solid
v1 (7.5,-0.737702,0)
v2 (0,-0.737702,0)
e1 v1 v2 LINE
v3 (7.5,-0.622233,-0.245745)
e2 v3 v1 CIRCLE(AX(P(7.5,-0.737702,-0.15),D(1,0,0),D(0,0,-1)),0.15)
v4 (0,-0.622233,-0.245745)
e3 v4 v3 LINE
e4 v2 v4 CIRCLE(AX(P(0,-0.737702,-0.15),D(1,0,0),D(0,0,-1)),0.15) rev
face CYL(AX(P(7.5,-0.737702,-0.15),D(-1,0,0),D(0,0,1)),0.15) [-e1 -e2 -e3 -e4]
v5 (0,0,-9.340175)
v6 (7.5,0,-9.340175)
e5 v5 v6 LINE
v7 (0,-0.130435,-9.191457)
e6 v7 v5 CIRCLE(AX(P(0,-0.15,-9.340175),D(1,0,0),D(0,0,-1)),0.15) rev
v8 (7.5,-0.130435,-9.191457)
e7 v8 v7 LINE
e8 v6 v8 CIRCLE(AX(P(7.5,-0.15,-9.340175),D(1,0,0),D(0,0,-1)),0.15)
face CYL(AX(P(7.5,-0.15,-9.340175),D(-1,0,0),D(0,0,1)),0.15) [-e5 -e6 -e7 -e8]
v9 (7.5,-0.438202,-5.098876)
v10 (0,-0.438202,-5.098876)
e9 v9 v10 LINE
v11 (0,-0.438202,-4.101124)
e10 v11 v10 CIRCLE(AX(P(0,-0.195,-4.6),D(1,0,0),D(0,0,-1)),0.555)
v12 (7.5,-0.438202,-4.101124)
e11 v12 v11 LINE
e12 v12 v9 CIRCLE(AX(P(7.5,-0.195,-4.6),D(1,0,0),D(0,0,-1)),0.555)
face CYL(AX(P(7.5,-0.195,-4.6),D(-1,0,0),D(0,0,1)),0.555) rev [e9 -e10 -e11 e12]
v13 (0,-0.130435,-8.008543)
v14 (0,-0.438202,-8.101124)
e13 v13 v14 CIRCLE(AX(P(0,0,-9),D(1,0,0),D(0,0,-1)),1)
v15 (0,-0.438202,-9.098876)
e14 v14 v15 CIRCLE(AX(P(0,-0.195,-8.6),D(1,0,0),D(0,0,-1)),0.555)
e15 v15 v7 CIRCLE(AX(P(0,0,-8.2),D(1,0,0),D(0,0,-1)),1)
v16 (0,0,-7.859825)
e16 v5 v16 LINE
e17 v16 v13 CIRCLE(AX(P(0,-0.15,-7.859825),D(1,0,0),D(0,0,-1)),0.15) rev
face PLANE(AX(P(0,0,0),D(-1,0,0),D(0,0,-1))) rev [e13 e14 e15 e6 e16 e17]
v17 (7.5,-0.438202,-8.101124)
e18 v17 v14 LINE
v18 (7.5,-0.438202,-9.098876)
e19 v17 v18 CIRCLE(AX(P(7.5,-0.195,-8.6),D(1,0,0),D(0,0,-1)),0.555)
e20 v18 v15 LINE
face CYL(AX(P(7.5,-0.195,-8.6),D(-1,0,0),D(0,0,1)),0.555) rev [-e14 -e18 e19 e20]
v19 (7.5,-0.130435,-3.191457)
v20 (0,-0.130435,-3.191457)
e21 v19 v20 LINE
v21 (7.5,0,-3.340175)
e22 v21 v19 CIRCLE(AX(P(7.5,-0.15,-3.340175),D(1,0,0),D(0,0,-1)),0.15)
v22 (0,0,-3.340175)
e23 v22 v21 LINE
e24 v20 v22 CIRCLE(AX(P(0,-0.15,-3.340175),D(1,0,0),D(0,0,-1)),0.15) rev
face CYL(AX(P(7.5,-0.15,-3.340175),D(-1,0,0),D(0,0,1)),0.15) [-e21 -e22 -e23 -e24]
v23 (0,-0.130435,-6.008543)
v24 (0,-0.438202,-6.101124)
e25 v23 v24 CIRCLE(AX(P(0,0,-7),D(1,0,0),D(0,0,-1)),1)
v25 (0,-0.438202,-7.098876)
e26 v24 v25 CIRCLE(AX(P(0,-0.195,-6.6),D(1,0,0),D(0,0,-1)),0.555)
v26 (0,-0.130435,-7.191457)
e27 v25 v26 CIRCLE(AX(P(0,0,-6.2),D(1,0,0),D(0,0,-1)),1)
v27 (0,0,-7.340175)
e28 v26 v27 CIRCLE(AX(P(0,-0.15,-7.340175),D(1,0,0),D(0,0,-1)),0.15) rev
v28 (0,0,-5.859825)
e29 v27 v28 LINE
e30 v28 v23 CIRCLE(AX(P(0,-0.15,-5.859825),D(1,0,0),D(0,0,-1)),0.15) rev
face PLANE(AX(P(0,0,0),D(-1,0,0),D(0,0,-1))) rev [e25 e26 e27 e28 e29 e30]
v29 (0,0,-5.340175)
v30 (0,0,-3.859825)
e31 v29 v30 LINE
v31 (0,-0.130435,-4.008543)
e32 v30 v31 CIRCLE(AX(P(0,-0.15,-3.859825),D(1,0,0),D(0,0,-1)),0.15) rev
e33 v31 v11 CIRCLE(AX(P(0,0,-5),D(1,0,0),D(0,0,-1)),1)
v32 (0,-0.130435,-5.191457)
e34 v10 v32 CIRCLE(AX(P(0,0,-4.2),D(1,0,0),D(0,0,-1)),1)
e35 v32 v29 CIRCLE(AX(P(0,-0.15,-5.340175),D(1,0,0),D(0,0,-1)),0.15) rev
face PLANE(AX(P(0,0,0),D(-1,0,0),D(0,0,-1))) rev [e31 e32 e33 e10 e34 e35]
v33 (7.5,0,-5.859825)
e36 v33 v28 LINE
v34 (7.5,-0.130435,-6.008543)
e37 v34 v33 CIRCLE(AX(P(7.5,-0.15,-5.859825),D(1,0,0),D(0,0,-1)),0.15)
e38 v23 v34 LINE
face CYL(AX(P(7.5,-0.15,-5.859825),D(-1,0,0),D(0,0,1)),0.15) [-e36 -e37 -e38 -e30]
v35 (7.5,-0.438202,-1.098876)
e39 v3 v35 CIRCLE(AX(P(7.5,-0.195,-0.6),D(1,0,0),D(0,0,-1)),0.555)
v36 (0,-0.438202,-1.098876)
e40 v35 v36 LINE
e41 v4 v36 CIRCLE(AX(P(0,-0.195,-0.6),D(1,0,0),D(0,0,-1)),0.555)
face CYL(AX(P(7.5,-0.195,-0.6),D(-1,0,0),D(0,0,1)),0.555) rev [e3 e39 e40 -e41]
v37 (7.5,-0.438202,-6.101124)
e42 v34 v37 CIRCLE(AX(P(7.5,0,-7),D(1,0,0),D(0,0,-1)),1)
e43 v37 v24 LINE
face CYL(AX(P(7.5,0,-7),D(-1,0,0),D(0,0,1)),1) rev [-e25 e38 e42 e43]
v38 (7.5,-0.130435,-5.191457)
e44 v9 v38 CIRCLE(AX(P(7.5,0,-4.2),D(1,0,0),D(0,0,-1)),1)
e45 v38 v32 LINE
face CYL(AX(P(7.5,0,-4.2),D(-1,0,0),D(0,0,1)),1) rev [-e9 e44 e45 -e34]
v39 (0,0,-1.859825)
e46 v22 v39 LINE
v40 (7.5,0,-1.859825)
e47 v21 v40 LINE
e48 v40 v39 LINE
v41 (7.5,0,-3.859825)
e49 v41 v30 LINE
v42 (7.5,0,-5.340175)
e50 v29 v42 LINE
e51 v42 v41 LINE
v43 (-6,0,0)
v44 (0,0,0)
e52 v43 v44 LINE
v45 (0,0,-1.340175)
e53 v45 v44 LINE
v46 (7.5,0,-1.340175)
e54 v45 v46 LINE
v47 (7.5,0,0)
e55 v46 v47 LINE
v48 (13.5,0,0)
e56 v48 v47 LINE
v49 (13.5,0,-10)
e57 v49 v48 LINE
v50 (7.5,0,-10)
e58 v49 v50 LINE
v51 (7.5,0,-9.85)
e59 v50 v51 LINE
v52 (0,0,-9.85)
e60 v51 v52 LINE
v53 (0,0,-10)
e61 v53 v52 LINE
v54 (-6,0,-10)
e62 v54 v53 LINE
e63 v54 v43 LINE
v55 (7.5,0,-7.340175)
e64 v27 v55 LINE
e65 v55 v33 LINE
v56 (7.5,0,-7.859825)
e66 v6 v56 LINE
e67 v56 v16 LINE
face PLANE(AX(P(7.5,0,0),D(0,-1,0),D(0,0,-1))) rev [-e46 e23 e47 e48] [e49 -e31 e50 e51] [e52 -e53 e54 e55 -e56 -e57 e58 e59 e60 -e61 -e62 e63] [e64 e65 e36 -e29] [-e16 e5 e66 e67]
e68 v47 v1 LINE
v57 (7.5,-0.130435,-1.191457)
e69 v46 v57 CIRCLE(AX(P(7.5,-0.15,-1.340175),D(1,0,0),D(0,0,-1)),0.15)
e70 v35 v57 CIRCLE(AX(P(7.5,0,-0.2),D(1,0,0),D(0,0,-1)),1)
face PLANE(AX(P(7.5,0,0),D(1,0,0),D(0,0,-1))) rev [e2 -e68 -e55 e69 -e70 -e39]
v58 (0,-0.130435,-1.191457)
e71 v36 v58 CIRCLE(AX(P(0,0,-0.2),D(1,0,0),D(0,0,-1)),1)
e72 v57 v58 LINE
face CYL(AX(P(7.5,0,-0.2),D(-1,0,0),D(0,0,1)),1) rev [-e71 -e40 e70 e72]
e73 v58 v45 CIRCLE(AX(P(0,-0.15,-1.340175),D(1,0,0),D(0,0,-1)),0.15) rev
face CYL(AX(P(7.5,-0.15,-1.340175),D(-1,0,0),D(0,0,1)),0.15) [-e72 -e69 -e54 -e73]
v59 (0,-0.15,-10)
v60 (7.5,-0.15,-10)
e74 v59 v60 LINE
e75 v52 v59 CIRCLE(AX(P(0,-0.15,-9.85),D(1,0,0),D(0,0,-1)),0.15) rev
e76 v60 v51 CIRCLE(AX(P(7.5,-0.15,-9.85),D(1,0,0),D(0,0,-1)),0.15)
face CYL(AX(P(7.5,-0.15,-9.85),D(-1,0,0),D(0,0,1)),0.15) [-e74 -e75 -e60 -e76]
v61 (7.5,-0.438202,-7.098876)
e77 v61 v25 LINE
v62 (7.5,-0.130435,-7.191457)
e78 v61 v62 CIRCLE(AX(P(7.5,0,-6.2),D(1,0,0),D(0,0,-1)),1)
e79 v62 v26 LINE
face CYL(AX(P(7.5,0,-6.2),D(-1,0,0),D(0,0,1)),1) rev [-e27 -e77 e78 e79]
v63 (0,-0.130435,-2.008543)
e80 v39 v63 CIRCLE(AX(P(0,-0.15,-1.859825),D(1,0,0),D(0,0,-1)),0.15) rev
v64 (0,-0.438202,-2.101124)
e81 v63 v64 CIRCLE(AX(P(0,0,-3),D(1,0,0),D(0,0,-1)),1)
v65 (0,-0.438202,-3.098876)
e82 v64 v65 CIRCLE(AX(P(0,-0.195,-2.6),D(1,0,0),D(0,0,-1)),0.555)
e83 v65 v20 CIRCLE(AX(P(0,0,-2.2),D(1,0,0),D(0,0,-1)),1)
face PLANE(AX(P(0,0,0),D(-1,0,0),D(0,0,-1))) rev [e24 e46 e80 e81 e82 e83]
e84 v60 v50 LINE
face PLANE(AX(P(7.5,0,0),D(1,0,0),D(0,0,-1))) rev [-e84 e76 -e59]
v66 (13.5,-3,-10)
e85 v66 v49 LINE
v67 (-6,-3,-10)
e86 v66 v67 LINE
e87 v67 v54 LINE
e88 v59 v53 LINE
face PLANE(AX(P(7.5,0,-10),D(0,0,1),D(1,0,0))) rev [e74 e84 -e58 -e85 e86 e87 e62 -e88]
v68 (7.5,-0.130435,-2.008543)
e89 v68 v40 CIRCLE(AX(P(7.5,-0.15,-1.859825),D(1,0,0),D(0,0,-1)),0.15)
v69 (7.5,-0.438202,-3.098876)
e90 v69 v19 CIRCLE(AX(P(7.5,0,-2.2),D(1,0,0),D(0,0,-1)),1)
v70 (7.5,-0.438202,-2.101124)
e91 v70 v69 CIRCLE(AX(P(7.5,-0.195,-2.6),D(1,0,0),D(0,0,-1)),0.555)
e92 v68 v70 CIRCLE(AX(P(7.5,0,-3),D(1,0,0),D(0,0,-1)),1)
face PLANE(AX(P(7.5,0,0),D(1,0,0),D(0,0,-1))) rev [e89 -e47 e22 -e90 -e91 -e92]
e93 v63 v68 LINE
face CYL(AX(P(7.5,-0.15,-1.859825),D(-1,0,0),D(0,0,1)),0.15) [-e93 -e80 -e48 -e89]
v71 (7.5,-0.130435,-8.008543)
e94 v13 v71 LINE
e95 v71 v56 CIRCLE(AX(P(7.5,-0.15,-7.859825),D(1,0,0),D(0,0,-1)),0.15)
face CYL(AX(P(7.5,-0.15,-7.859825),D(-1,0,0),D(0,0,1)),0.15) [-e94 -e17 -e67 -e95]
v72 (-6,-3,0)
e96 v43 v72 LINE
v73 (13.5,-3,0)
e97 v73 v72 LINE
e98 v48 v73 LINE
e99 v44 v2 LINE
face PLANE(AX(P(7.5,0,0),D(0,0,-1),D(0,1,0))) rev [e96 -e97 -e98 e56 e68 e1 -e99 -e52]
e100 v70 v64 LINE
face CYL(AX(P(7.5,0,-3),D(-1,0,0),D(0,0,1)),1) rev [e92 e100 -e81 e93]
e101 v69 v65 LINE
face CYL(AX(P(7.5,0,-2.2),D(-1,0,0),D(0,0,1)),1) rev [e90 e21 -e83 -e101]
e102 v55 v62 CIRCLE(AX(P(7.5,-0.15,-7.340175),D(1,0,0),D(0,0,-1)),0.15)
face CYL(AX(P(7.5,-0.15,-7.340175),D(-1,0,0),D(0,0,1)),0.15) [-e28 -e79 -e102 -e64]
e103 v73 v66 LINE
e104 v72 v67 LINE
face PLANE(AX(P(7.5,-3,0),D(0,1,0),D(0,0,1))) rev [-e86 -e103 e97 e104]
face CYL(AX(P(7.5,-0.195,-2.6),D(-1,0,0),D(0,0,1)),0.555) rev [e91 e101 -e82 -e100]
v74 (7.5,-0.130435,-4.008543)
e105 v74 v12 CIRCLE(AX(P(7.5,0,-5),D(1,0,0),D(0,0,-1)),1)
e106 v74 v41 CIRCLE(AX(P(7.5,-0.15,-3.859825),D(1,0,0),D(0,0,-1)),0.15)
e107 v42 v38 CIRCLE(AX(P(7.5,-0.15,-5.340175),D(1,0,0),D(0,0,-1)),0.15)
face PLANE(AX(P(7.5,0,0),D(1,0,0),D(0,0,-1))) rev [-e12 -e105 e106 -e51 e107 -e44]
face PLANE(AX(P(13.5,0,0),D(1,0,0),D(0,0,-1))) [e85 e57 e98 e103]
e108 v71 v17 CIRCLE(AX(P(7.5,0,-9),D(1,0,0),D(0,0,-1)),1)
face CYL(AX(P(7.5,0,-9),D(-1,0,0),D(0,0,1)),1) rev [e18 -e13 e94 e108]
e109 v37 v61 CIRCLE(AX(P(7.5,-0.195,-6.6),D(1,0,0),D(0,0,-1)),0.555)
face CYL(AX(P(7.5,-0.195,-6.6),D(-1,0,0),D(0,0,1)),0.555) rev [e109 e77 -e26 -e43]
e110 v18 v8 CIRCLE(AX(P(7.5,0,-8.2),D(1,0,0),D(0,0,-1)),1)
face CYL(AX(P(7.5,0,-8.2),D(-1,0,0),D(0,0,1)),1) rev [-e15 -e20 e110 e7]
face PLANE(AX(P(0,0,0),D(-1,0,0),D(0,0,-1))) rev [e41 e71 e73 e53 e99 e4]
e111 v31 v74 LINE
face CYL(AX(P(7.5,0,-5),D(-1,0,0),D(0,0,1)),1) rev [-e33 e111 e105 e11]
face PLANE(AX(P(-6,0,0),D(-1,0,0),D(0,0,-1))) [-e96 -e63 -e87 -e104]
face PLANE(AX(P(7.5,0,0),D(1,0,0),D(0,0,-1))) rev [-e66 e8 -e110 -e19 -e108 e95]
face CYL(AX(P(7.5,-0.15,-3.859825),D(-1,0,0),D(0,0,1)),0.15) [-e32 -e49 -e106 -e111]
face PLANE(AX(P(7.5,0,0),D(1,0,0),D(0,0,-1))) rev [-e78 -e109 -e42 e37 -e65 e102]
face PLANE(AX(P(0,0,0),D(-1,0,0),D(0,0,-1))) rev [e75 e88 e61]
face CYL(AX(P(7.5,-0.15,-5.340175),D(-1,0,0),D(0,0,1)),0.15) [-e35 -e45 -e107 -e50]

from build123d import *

# Parameters (mm, degrees)
SKETCH2_W           = 10
SKETCH2_H           = 3
BOSS_EXTRUDE1_DEPTH = 7.5
CUT_EXTRUDE2_DEPTH  = 13.854960132
LPATTERN2_COUNT     = 10
LPATTERN2_PITCH     = 2
FILLET2_START       = -1
FILLET2_DEPTH       = 9
SKETCH3_W           = 10
SKETCH3_H           = 3
BOSS_EXTRUDE2_DEPTH = 6


with BuildPart() as part:
    # Sketch2 → Boss-Extrude1 (new body)
    with BuildSketch(Plane(origin=(0, 0, 0), x_dir=(0, 0, -1), z_dir=(1, 0, 0))):
        with Locations((5, -1.5)):
            Rectangle(SKETCH2_W, SKETCH2_H)
    extrude(amount=BOSS_EXTRUDE1_DEPTH)

    # Sketch1 → Cut-Extrude2 (cut, through all)
    with BuildSketch(Plane(origin=(0, 0, 0), x_dir=(0, 0, -1), z_dir=(1, 0, 0))):
        with BuildLine():
            ThreePointArc((0.10112359, -0.438202237), (0.045620517, -0.221237163), (0.080384758, 0))
            Line((0.080384758, 0), (0, 0))
            ThreePointArc((0, 0), (0.025608803, -0.224859501), (0.10112359, -0.438202237))
        make_face()
        with BuildLine():
            ThreePointArc((1.155, -0.195), (1.146082164, -0.095907769), (1.119615242, 0))
            Line((1.119615242, 0), (0.080384758, 0))
            ThreePointArc((0.080384758, 0), (0.045620517, -0.221237163), (0.10112359, -0.438202237))
            ThreePointArc((0.10112359, -0.438202237), (0.6, -0.75), (1.09887641, -0.438202237))
            ThreePointArc((1.09887641, -0.438202237), (1.140787115, -0.319797021), (1.155, -0.195))
        make_face()
        with BuildLine():
            Line((0.080384758, 0), (1.119615242, 0))
            ThreePointArc((1.119615242, 0), (0.6, 0.36), (0.080384758, 0))
        make_face()
        with BuildLine():
            ThreePointArc((1.09887641, -0.438202237), (1.174391197, -0.224859501), (1.2, 0))
            Line((1.2, 0), (1.119615242, 0))
            ThreePointArc((1.119615242, 0), (1.146082164, -0.095907769), (1.155, -0.195))
            ThreePointArc((1.155, -0.195), (1.140787115, -0.319797021), (1.09887641, -0.438202237))
        make_face()
    cut_extrude2 = extrude(amount=CUT_EXTRUDE2_DEPTH, mode=Mode.SUBTRACT)

    # LPattern2: Cut-Extrude2 ×10
    with Locations(*[(0, 0, -i * LPATTERN2_PITCH) for i in range(1, LPATTERN2_COUNT)]):
        add(cut_extrude2, mode=Mode.SUBTRACT)

    # Fillet2: read off the stored shape, not the designer's step
    # Fillet2 outline → Fillet2 (cut)
    with BuildSketch(Plane.YZ.offset(FILLET2_START)):
        with BuildLine():
            Line((0, -10), (0, -9.85))
            ThreePointArc((0, -9.85), (-0.043933983, -9.956066017), (-0.15, -10))
            Line((-0.15, -10), (0, -10))
        make_face()
        with BuildLine():
            ThreePointArc((-0.130434783, -9.191456891), (-0.037228588, -9.241268354), (0, -9.340175425))
            Line((0, -9.340175425), (0, -9.2))
            ThreePointArc((0, -9.2), (-0.065357129, -9.197861937), (-0.130434783, -9.191456891))
        make_face()
        with BuildLine():
            Line((0, -8), (0, -7.859824575))
            ThreePointArc((0, -7.859824575), (-0.037228588, -7.958731646), (-0.130434783, -8.008543109))
            ThreePointArc((-0.130434783, -8.008543109), (-0.065357129, -8.002138063), (0, -8))
        make_face()
        with BuildLine():
            ThreePointArc((-0.130434783, -7.191456891), (-0.037228588, -7.241268354), (0, -7.340175425))
            Line((0, -7.340175425), (0, -7.2))
            ThreePointArc((0, -7.2), (-0.065357129, -7.197861937), (-0.130434783, -7.191456891))
        make_face()
        with BuildLine():
            Line((0, -6), (0, -5.859824575))
            ThreePointArc((0, -5.859824575), (-0.037228588, -5.958731646), (-0.130434783, -6.008543109))
            ThreePointArc((-0.130434783, -6.008543109), (-0.065357129, -6.002138063), (0, -6))
        make_face()
        with BuildLine():
            ThreePointArc((-0.130434783, -5.191456891), (-0.037228588, -5.241268354), (0, -5.340175425))
            Line((0, -5.340175425), (0, -5.2))
            ThreePointArc((0, -5.2), (-0.065357129, -5.197861937), (-0.130434783, -5.191456891))
        make_face()
        with BuildLine():
            Line((0, -4), (0, -3.859824575))
            ThreePointArc((0, -3.859824575), (-0.037228588, -3.958731646), (-0.130434783, -4.008543109))
            ThreePointArc((-0.130434783, -4.008543109), (-0.065357129, -4.002138063), (0, -4))
        make_face()
        with BuildLine():
            ThreePointArc((-0.130434783, -3.191456891), (-0.037228588, -3.241268354), (0, -3.340175425))
            Line((0, -3.340175425), (0, -3.2))
            ThreePointArc((0, -3.2), (-0.065357129, -3.197861937), (-0.130434783, -3.191456891))
        make_face()
        with BuildLine():
            Line((0, -2), (0, -1.859824575))
            ThreePointArc((0, -1.859824575), (-0.037228588, -1.958731646), (-0.130434783, -2.008543109))
            ThreePointArc((-0.130434783, -2.008543109), (-0.065357129, -2.002138063), (0, -2))
        make_face()
        with BuildLine():
            ThreePointArc((-0.737701575, 0), (-0.601941305, -0.086210119), (-0.622233155, -0.245744681))
            ThreePointArc((-0.622233155, -0.245744681), (-0.537928158, -0.163622551), (-0.438202247, -0.101123596))
            ThreePointArc((-0.438202247, -0.101123596), (-0.224859507, -0.025608804), (0, 0))
            Line((0, 0), (-0.737701575, 0))
        make_face()
        with BuildLine():
            ThreePointArc((-0.130434783, -1.191456891), (-0.037228588, -1.241268354), (0, -1.340175425))
            Line((0, -1.340175425), (0, -1.2))
            ThreePointArc((0, -1.2), (-0.065357129, -1.197861937), (-0.130434783, -1.191456891))
        make_face()
    extrude(amount=FILLET2_DEPTH, mode=Mode.SUBTRACT)

    # Sketch3 → Boss-Extrude2 (add)
    with BuildSketch(Plane(origin=(7.5, 0, 0), x_dir=(0, 0, -1), z_dir=(1, 0, 0))):
        with Locations((5, -1.5)):
            Rectangle(SKETCH3_W, SKETCH3_H)
    boss_extrude2 = extrude(amount=BOSS_EXTRUDE2_DEPTH)

    # Mirror1: Boss-Extrude2 across plane
    add(boss_extrude2.mirror(Plane.ZY.offset(-3.75)))


solid = part.part
